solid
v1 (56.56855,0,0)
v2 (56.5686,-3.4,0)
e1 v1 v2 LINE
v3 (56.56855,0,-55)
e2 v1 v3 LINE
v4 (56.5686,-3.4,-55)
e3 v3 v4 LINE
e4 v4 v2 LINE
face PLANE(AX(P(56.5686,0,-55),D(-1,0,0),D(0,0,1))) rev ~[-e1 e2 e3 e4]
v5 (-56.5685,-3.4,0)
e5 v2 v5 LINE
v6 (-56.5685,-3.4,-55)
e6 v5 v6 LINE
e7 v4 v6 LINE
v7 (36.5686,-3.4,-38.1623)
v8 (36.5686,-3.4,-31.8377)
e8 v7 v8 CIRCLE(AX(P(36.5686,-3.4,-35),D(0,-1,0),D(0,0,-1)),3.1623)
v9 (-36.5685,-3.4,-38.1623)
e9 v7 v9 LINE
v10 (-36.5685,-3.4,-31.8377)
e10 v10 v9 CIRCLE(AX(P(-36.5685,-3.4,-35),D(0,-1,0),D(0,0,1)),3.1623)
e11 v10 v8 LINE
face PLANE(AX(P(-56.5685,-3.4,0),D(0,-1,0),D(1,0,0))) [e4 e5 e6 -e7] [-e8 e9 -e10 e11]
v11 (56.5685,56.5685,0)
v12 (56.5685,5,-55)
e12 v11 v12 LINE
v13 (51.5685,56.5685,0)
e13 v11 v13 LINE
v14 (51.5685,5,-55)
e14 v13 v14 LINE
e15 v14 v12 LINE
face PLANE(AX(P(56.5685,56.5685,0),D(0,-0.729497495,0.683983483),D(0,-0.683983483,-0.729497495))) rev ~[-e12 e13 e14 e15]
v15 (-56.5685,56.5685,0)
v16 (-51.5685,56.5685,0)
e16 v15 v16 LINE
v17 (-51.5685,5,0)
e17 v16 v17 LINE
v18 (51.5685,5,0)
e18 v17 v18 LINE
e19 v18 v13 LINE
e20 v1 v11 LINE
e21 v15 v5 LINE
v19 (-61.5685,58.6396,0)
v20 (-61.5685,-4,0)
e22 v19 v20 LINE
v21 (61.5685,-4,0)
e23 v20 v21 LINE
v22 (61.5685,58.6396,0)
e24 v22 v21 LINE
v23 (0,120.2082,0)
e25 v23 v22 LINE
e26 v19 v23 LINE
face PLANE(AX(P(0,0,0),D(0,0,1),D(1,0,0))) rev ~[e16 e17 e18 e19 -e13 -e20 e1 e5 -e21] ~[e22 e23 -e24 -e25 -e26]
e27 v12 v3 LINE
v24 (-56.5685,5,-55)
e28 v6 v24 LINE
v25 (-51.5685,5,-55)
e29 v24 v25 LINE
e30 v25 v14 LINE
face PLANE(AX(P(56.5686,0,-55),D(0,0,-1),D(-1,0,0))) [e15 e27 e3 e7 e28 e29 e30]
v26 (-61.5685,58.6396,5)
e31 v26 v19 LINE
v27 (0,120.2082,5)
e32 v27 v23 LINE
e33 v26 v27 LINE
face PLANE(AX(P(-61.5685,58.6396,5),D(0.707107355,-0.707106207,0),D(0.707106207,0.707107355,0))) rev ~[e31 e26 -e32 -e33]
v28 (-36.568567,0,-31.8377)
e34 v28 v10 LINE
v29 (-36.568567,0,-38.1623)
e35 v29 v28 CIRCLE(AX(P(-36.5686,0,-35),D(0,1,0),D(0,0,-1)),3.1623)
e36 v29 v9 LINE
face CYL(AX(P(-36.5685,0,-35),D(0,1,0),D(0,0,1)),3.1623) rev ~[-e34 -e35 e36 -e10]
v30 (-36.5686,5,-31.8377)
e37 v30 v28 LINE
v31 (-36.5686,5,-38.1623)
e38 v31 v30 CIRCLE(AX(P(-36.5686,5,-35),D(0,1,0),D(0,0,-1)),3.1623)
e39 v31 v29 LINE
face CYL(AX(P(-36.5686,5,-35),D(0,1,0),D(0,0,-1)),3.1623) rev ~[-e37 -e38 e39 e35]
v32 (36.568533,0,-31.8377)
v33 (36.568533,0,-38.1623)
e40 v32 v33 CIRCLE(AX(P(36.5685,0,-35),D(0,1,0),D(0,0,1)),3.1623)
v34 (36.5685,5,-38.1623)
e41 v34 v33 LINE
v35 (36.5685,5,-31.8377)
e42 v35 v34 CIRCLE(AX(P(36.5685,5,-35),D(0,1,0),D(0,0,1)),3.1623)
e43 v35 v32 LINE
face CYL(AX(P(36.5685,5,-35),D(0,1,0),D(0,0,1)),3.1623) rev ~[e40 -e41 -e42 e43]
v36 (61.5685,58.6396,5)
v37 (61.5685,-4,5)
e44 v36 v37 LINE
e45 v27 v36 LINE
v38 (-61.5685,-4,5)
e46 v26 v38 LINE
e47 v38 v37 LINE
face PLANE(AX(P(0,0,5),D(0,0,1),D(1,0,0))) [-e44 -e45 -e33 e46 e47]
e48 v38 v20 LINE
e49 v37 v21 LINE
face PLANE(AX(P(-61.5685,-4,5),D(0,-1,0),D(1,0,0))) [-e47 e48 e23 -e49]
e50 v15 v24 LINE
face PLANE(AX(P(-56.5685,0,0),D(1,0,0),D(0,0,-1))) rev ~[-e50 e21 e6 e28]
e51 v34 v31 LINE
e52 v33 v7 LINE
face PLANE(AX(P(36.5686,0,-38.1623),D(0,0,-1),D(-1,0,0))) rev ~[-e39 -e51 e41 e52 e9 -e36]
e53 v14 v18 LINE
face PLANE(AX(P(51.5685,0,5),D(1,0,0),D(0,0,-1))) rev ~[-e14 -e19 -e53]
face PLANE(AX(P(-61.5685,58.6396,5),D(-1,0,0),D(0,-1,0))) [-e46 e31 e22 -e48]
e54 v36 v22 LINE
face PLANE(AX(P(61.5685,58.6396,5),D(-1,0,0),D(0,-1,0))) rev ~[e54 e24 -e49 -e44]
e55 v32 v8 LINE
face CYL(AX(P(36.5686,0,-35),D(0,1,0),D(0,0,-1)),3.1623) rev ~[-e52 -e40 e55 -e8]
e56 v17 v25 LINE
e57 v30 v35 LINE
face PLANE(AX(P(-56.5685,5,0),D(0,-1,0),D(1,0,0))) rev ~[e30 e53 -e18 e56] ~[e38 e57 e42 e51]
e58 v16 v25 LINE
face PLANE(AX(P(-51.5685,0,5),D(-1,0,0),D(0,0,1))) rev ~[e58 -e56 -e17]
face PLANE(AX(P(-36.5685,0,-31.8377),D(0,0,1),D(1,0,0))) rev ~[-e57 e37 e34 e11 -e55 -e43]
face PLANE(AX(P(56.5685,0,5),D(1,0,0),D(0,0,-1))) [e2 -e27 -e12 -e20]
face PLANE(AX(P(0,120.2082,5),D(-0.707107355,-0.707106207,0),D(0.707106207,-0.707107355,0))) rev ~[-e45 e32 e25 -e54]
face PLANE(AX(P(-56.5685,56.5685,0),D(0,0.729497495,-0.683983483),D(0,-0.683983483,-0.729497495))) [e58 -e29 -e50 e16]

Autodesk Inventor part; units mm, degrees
ref_plane "YZ Plane" through (0, 0, 0) normal (1, 0, 0) x (0, 1, 0)
ref_plane "XZ Plane" through (0, 0, 0) normal (0, 1, 0) x (-1, 0, 0)
ref_plane "XY Plane" through (0, 0, 0) normal (0, 0, 1) x (1, 0, 0)
sketch "Skizze1" plane through (0, 0, 0) normal (0, 0, 1) x (1, 0, 0)
  line L0 (0, 113.1371) -> (56.5685, 56.5685)
  line L1 (56.5685, 56.5685) -> (0, 0) construction
  line L2 (0, 0) -> (-56.5685, 56.5685) construction
  line L3 (-56.5685, 56.5685) -> (0, 113.1371)
  line L4 (0, 0) -> (-109.9706, 0) construction
  line L5 (-56.5685, 56.5685) -> (-56.5685, 0)
  line L6 (56.5685, 56.5685) -> (56.5685, 0)
  line L7 (-56.5685, 0) -> (56.5685, 0)
  dimension "d0" = 45
  dimension "d1" = 80
extrude "Extrusion1" add sketch "Skizze1" along normal blind 5
sketch "Skizze2" plane through (0, 0, 0) normal (0, 0, -1) x (-1, 0, 0)
  line L0 (-56.5685, 0) -> (56.5685, 0)
  line L1 (56.5685, 0) -> (56.5685, 5)
  line L2 (56.5685, 5) -> (-56.5685, 5)
  line L3 (-56.5685, 5) -> (-56.5685, 0)
  line L4 (56.5685, 0) -> (-56.5685, 0) construction
  line L5 (56.5685, 56.5685) -> (56.5685, 0) construction
  line L6 (0, 113.1371) -> (56.5685, 56.5685) construction
  line L7 (-56.5685, 56.5685) -> (0, 113.1371) construction
  line L8 (-56.5685, 0) -> (-56.5685, 56.5685) construction
  point P0 (0, 0)
  dimension "d4" = 5
extrude "Extrusion2" add sketch "Skizze2" along normal blind 55
sketch "Skizze3" plane through (56.5685, 0, 5) normal (1, 0, 0) x (0, 0, -1)
  line L0 (5, 5) -> (5, 56.5685) construction
  line L1 (5, 5) -> (60, 5) construction
  line L2 (5, 56.5685) -> (60, 5)
  line L3 (60, 5) -> (5, 5)
  line L4 (5, 5) -> (5, 56.5685)
  point P0 (5, 0)
extrude "Extrusion3" add sketch "Skizze3" against normal blind 5
sketch "Skizze4" plane through (-56.5685, 0, 5) normal (-1, 0, 0) x (0, 0, 1)
  line L0 (-5, 5) -> (-60, 5) projected
  line L1 (-5, 56.5685) -> (-5, 5) projected
  line L2 (-5, 56.5685) -> (-60, 5) projected
  point P0 (-5, 0)
extrude "Extrusion4" add sketch "Skizze4" against normal blind 5
sketch "Skizze5" plane through (51.5685, 5, 0) normal (0, 1, 0) x (1, 0, 0)
  line L0 (-15, 35) -> (-88.1371, 35) construction
  line L1 (-15, 38.1623) -> (-88.1371, 38.1623)
  line L2 (-88.1371, 31.8377) -> (-15, 31.8377)
  arc A0 (-15, 31.8377) -> (-15, 38.1623) centre (-15, 35) ccw
  arc A1 (-88.1371, 38.1623) -> (-88.1371, 31.8377) centre (-88.1371, 35) ccw
  line L3 (-103.1371, 55) -> (-103.1371, 0) construction
  line L4 (0, 0) -> (-103.1371, 0) construction
  line L5 (0, 0) -> (0, 55) construction
  line L6 (-103.1371, 55) -> (0, 55) construction
  point P0 (-51.5685, 0)
  point P1 (-51.5685, 35)
  dimension "d11" = 20
  dimension "d12" = 15
  dimension "d13" = 15
extrude "Extrusion5" cut sketch "Skizze5" against normal through all
sketch "Skizze6" plane through (0, 0, 5) normal (0, 0, 1) x (1, 0, 0)
  line L0 (-56.5685, 0) -> (56.5685, 0) projected
  line L1 (56.5685, 0) -> (56.5685, 56.5685) projected
  line L2 (56.5685, 56.5685) -> (0, 113.1371) projected
  line L3 (0, 113.1371) -> (-56.5685, 56.5685) projected
  line L4 (-56.5685, 56.5685) -> (-56.5685, 0) projected
  line L5 (-61.5685, 58.6396) -> (0, 120.2082)
  line L6 (0, 120.2082) -> (61.5685, 58.6396)
  line L7 (61.5685, 58.6396) -> (61.5685, -4)
  line L8 (-61.5685, 58.6396) -> (-61.5685, -4)
  line L9 (-61.5685, -4) -> (61.5685, -4)
  line L10 (56.5685, 56.5685) -> (0, 113.1371) projected
  line L11 (-56.5685, 0) -> (56.5685, 0) projected
  point P0 (0, 0)
  dimension "d16" = 5
  dimension "d17" = 5
  dimension "d18" = 5
  dimension "d19" = 5
  dimension "d20" = 4
extrude "Extrusion6" add sketch "Skizze6" against normal up to surface (5 mm away)
sketch "Skizze7" plane through (-56.5685, 0, 0) normal (0, -1, 0) x (1, 0, 0)
  line L0 (113.1371, 0) -> (0, 0) projected
  line L1 (0, 0) -> (0, -55) projected
  line L2 (113.1371, -55) -> (0, -55) projected
  line L3 (113.1371, -55) -> (113.1371, 0) projected
  line L4 (20, -31.8377) -> (93.1371, -31.8377) projected
  arc A0 (93.1371, -38.1623) -> (93.1371, -31.8377) centre (93.1371, -35) ccw projected
  line L5 (93.1371, -38.1623) -> (20, -38.1623) projected
  arc A1 (20, -31.8377) -> (20, -38.1623) centre (20, -35) ccw projected
  point P0 (56.5685, 0)
extrude "Extrusion7" add sketch "Skizze7" along normal blind 3.4
sketch "Skizze8" plane through (0, 0, -55) normal (0, 0, -1) x (-1, 0, 0)
  line L0 (56.5685, -3.4) -> (56.5685, 56.5685) construction
  line L1 (56.5685, -3.4) -> (-56.5685, -3.4) construction
  line L2 (-56.5685, -3.4) -> (-56.5685, 56.5685) construction
  line L3 (-56.5685, 56.5685) -> (-51.5685, 56.5685) construction
  line L4 (-51.5685, 56.5685) -> (-51.5685, 5) construction
  line L5 (-51.5685, 5) -> (51.5685, 5) construction
  line L6 (51.5685, 5) -> (51.5685, 56.5685) construction
  line L7 (51.5685, 56.5685) -> (56.5685, 56.5685) construction
  line L8 (0, 120.2082) -> (-61.5685, 58.6396) construction
  line L9 (-61.5685, 58.6396) -> (-61.5685, -4) construction
  line L10 (-61.5685, -4) -> (61.5685, -4) construction
  line L11 (61.5685, -4) -> (61.5685, 58.6396) construction
  line L12 (61.5685, 58.6396) -> (0, 120.2082) construction
  line L13 (96.047, 0) -> (96.047, 100) construction
  point P0 (0, 0)
  dimension "d25" = 96.047
properties part number "Halterung_ID6"
